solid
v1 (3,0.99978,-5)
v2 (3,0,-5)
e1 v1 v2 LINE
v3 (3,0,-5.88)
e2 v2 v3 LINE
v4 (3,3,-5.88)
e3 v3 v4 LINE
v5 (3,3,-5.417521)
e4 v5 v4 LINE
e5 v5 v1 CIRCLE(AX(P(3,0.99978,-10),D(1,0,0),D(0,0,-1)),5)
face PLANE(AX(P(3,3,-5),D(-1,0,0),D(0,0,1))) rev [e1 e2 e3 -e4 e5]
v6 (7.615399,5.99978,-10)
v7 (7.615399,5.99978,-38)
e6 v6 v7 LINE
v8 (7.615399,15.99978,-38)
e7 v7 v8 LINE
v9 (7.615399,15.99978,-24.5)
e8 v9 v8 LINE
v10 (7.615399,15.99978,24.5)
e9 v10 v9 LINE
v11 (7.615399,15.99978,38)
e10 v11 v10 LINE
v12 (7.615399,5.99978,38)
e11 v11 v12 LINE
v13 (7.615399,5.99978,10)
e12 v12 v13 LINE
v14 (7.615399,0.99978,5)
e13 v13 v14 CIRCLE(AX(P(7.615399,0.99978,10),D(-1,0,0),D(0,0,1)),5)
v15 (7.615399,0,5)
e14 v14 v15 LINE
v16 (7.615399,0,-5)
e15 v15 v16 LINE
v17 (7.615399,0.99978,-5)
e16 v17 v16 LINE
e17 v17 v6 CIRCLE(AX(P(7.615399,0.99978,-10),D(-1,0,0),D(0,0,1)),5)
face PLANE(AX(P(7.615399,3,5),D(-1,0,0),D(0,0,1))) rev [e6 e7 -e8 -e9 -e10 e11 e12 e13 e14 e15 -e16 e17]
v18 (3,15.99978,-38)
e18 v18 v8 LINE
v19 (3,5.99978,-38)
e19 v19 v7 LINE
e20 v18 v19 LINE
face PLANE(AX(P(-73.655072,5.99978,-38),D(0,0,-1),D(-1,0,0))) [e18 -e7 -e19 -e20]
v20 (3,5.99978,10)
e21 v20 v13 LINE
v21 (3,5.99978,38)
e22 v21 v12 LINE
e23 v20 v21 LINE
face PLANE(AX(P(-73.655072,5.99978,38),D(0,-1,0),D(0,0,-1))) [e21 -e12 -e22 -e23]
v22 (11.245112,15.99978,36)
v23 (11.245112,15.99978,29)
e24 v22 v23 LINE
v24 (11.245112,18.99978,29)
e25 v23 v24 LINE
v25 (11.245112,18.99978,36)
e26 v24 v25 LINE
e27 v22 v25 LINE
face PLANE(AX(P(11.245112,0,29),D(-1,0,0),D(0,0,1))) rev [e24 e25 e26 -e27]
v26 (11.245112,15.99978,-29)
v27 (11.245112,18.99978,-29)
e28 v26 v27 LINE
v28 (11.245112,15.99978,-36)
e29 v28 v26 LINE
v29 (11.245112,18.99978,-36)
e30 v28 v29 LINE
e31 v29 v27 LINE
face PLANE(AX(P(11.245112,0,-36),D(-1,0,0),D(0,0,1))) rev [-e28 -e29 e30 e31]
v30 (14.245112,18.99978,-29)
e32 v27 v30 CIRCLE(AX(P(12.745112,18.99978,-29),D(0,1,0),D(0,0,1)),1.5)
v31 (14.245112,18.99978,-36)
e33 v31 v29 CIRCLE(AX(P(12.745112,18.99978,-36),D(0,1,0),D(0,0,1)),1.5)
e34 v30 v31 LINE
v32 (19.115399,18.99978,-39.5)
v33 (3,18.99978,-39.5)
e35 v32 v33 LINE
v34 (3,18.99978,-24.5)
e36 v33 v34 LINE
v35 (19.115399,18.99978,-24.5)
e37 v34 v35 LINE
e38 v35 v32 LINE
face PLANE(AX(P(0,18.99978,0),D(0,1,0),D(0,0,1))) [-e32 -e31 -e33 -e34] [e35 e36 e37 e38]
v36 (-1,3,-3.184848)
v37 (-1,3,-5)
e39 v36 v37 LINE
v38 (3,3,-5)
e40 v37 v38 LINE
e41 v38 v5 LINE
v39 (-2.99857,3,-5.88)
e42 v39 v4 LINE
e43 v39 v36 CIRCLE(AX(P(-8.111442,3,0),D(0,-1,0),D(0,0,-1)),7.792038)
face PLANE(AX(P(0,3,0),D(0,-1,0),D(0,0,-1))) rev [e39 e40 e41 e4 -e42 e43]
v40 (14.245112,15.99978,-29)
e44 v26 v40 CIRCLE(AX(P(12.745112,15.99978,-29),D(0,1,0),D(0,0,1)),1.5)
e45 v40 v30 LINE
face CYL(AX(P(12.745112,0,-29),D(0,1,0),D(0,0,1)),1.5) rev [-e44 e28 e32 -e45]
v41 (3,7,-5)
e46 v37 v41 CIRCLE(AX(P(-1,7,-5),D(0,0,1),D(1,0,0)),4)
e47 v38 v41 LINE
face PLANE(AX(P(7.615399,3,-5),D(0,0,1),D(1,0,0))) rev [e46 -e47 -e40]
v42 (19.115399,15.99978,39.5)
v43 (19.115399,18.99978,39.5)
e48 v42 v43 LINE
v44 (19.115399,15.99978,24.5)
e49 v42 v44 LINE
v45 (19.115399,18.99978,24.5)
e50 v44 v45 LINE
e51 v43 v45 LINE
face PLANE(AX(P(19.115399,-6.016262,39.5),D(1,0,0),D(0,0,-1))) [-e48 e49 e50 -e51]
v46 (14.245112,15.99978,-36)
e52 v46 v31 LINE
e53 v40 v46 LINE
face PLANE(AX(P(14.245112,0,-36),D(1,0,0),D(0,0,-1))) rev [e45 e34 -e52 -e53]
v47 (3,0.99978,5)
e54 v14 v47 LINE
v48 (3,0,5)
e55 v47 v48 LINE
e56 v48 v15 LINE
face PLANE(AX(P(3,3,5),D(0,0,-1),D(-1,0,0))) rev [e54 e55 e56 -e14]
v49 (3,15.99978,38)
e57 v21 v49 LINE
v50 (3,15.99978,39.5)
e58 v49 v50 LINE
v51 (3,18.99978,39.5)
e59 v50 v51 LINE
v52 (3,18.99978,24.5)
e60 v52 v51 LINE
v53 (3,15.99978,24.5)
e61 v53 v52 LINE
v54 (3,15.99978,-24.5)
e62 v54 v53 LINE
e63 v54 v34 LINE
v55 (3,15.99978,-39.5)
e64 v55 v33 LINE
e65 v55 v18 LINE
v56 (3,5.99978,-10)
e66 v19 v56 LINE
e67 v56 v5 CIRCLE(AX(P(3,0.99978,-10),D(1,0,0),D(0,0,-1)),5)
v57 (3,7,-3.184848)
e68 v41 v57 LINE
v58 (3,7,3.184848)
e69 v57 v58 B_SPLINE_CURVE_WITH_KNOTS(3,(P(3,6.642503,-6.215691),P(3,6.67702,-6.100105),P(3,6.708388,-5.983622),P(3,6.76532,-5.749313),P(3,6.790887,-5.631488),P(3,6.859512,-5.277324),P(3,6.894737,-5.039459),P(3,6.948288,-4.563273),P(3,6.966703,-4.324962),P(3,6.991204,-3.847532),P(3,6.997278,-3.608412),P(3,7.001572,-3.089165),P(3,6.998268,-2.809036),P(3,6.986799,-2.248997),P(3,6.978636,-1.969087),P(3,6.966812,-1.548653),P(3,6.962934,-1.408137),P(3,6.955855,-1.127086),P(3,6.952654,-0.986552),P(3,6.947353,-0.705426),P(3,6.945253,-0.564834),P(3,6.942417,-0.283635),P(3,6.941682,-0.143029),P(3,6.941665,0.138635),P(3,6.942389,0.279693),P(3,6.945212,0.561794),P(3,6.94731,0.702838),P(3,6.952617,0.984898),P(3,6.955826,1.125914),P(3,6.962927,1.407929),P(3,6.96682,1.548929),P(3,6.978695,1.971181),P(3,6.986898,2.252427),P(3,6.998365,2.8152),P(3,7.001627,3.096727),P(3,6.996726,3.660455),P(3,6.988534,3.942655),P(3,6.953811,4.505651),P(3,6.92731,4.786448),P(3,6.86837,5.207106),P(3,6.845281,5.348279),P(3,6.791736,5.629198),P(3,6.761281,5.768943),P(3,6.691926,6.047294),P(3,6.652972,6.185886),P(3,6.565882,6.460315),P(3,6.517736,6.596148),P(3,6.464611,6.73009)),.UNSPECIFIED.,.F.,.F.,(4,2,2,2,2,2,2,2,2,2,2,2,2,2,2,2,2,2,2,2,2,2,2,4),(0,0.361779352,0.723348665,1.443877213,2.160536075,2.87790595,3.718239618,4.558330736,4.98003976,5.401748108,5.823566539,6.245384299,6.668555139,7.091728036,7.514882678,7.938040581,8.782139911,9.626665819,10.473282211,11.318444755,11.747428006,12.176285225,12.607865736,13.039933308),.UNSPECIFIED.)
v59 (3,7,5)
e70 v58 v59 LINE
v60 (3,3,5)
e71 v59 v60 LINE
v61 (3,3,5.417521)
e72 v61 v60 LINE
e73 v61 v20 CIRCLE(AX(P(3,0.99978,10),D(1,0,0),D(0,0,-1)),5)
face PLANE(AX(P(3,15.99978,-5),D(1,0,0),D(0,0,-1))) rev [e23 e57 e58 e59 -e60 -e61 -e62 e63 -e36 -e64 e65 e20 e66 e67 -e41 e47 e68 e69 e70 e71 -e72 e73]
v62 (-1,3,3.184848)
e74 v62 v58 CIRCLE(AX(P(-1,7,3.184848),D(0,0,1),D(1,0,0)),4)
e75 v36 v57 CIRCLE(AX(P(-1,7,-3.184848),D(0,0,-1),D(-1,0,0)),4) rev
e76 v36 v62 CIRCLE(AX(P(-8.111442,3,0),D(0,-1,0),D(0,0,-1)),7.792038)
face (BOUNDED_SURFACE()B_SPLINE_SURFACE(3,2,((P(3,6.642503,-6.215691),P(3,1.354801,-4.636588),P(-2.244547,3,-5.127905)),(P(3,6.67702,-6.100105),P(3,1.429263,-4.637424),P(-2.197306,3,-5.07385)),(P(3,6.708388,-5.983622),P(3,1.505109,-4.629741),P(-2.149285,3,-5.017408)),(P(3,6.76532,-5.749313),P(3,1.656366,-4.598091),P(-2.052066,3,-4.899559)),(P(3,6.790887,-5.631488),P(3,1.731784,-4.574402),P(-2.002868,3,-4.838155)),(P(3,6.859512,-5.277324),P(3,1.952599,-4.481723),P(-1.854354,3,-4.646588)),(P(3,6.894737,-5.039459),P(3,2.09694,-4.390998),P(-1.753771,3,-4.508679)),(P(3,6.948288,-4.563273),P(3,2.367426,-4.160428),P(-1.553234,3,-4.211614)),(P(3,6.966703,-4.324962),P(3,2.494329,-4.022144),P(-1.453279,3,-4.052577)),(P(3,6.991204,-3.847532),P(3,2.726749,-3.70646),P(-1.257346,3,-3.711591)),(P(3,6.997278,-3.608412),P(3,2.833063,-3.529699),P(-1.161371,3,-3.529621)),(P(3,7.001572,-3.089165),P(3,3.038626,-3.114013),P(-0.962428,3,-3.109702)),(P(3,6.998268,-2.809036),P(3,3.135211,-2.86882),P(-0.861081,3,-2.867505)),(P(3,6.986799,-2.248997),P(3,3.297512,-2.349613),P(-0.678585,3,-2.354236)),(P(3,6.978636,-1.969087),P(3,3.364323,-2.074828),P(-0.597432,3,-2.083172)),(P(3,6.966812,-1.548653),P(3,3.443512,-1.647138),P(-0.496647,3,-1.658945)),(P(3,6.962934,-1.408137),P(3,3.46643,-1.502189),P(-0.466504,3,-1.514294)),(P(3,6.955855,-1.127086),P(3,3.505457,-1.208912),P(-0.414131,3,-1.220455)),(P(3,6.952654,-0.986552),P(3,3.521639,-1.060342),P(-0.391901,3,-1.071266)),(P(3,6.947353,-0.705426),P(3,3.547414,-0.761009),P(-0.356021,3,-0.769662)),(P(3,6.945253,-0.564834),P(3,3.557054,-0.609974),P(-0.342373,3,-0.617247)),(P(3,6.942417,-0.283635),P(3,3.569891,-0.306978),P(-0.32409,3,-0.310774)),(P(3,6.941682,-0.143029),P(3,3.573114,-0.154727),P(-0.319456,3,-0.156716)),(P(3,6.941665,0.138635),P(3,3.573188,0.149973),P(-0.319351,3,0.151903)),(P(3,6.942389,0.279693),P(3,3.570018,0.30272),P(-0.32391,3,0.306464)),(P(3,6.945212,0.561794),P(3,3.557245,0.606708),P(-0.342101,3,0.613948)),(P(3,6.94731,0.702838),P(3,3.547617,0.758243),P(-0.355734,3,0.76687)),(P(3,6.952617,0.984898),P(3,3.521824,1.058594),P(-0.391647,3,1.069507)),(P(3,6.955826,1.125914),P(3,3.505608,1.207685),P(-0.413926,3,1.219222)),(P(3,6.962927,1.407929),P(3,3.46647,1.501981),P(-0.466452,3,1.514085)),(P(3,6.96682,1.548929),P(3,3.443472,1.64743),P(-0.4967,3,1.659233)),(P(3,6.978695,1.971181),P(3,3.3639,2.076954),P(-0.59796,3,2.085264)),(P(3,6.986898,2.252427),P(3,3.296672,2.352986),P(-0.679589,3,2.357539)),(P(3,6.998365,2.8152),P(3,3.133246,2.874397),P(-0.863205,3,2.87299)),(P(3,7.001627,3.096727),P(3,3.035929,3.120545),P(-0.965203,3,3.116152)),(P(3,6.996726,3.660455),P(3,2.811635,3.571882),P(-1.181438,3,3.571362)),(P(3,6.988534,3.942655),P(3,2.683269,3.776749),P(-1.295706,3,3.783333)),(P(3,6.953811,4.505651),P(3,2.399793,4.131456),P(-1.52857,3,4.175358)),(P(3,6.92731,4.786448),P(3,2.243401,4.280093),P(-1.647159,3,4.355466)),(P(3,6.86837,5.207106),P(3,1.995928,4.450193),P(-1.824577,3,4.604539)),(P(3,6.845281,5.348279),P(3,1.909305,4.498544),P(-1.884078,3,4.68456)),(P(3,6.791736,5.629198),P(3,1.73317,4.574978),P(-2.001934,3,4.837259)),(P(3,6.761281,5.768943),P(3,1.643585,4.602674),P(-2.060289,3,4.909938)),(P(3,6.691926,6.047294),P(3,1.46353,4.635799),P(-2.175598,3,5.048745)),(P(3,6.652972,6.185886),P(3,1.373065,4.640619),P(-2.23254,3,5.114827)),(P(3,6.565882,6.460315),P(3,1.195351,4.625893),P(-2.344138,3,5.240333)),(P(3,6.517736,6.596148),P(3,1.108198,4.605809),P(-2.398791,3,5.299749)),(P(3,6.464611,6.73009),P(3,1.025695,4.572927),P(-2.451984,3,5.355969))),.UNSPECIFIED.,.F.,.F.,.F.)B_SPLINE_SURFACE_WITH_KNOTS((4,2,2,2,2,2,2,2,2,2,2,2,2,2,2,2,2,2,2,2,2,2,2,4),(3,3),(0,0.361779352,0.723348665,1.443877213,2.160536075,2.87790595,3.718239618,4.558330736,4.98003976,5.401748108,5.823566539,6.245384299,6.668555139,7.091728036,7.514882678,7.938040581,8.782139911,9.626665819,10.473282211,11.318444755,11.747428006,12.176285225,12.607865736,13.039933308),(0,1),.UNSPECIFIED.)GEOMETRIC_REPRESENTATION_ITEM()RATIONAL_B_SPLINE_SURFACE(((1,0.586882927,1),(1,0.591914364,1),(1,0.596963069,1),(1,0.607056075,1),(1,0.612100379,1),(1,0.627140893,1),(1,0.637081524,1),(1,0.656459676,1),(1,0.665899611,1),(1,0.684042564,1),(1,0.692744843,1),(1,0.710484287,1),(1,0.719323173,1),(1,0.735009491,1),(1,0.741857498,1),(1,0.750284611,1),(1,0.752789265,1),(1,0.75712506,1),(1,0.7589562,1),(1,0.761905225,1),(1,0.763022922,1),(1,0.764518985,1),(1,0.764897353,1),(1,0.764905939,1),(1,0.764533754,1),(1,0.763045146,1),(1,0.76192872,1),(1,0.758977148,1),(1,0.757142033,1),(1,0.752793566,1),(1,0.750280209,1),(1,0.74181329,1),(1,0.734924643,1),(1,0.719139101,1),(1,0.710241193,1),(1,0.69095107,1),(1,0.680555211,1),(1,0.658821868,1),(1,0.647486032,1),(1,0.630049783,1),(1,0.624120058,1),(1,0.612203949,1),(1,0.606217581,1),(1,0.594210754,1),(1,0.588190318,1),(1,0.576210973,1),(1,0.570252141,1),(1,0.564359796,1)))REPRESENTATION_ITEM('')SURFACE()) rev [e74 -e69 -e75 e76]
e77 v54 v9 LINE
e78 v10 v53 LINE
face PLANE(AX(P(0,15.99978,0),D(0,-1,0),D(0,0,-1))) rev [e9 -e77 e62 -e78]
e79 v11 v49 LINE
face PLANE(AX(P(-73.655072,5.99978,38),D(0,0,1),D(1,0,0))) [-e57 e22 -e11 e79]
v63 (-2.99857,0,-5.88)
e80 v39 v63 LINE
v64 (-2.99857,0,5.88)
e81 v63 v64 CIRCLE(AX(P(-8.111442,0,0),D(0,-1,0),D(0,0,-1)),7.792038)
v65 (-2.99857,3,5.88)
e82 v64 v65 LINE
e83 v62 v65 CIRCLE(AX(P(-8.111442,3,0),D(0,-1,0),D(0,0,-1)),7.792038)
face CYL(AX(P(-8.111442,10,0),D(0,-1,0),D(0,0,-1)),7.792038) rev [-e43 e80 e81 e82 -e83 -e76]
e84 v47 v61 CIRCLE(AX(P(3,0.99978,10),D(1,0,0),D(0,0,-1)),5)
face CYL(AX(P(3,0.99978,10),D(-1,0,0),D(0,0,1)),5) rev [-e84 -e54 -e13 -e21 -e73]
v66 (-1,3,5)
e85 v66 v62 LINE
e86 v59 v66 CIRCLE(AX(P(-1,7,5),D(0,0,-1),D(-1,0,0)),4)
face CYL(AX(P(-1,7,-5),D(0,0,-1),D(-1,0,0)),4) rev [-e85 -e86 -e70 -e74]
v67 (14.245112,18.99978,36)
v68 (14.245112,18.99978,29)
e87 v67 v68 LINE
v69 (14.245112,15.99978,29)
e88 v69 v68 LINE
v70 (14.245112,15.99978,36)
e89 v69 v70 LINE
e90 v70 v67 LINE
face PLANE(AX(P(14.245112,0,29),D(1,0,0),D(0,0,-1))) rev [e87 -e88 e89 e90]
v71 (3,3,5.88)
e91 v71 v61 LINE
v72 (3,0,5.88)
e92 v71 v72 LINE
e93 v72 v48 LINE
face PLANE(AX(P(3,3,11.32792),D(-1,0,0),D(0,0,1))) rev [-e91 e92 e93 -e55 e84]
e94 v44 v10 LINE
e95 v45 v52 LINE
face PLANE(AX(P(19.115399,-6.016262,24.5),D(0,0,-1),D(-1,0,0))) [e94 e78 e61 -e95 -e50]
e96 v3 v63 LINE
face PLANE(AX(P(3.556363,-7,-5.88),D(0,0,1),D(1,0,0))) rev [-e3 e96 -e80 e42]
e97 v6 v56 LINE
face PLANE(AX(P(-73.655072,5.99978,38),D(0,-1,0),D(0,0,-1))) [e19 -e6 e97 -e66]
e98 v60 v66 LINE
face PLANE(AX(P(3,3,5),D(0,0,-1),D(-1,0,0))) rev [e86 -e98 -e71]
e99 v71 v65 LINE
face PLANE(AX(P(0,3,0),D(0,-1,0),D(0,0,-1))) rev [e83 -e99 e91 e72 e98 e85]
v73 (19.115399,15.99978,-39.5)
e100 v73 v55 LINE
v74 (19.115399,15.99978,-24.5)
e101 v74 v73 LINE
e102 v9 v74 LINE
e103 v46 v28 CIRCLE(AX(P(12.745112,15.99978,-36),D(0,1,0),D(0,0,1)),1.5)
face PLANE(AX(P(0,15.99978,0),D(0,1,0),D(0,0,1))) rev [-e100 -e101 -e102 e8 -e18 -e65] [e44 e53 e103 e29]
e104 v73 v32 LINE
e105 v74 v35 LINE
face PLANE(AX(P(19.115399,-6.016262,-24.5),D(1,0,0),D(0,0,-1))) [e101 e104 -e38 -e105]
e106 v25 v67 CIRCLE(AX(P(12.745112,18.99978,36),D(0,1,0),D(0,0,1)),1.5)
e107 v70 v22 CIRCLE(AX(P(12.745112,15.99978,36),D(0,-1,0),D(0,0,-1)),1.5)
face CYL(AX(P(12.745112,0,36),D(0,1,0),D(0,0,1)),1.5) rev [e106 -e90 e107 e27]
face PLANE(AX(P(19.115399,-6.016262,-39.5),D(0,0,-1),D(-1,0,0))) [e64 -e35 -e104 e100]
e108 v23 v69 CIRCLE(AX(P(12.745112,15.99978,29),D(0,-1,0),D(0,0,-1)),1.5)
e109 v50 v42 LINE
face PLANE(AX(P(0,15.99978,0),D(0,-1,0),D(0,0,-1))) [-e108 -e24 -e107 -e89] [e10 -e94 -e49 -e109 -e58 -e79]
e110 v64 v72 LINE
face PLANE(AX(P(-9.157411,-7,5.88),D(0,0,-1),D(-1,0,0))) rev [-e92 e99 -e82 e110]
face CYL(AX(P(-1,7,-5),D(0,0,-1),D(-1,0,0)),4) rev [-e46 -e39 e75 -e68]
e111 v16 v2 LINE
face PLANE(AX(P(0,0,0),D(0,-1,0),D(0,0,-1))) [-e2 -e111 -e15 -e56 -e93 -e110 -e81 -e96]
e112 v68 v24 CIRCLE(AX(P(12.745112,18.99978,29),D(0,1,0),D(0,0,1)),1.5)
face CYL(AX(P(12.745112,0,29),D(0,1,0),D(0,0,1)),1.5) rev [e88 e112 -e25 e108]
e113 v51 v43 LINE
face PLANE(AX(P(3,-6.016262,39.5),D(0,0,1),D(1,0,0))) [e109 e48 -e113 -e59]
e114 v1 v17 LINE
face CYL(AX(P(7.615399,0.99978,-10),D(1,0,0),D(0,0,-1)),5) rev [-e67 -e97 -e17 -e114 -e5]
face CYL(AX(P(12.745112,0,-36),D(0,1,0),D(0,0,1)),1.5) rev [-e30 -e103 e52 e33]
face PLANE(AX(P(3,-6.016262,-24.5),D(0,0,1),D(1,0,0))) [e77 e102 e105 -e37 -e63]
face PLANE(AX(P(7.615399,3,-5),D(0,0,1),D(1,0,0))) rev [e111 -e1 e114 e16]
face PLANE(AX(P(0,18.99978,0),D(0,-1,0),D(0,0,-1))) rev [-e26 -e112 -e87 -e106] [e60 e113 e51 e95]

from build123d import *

# Parameters (mm, degrees)
SKETCH1_R           = 1.5
BOSS_EXTRUDE1_DEPTH = 3
SKETCH3_W           = 4.615398666
SKETCH3_H           = 10
BOSS_EXTRUDE2_DEPTH = 12.9997796
FILLET7_R           = 1
CUT_EXTRUDE4_DEPTH  = 10
FILLET8_R           = 4
SKETCH8_W           = 76
SKETCH8_H           = 10
BOSS_EXTRUDE3_DEPTH = 4.615398666
SKETCH9_W           = 14.615398666
SKETCH9_H           = 12
SKETCH9_R           = 1.5
BOSS_EXTRUDE4_DEPTH = 3
FILLET9_R           = 5
FILLET10_R          = 5
SKETCH10_W          = 9.773230982
SKETCH10_H          = 9.985016007
SKETCH10_W_2        = 12.713773796
SKETCH10_H_2        = 7.76031956
CUT_EXTRUDE6_DEPTH  = 10
CUT_EXTRUDE7_DEPTH  = 46.992324429
BOSS_EXTRUDE5_DEPTH = 3


with BuildPart() as part:
    # Sketch1 → Boss-Extrude1 (new body)
    with BuildSketch(Plane(origin=(0, 0, 0), x_dir=(1, 0, 0), z_dir=(0, 1, 0))):
        Polygon((-3, -11.32792047), (3, -11.32792047), (3, -5), (7.615398666, -5), (7.615398666, 5), (3, 5), (3, 11.32792047), (-3, 11.32792047), align=None)
        with Locations(Location((0, 8.5, 0), (0, 0, 270))):
            Circle(SKETCH1_R, mode=Mode.SUBTRACT)
        with Locations(Location((0, -8.5, 0), (0, 0, 270))):
            Circle(SKETCH1_R, mode=Mode.SUBTRACT)
    extrude(amount=BOSS_EXTRUDE1_DEPTH)

    # Sketch3 → Boss-Extrude2 (add)
    with BuildSketch(Plane(origin=(0, 3, 0), x_dir=(1, 0, 0), z_dir=(0, 1, 0))):
        with Locations((5.307699333, 0)):
            Rectangle(SKETCH3_W, SKETCH3_H)
    extrude(amount=BOSS_EXTRUDE2_DEPTH)

    # Fillet7
    fillet7_edges = [part.edges().sort_by_distance(p)[0] for p in [
        (3, 1.5, 11.32792047),
        (3, 1.5, -11.32792047),
    ]]
    fillet(fillet7_edges, radius=FILLET7_R)

    # Sketch7 → Cut-Extrude4 (cut)
    with BuildSketch(Plane.XZ):
        with BuildLine():
            Line((-3.65526474, -6.392053518), (-3.78188192, 6.478485425))
            ThreePointArc((-3.78188192, 6.478485425), (-0.319780446, 0.076652438), (-3.65526474, -6.392053518))
        make_face()
    extrude(amount=-CUT_EXTRUDE4_DEPTH, mode=Mode.SUBTRACT)

    # Fillet8
    fillet8_edges = [part.edges().sort_by_distance(p)[0] for p in [
        (3, 3, 0),
    ]]
    fillet(fillet8_edges, radius=FILLET8_R)

    # Sketch8 → Boss-Extrude3 (add)
    with BuildSketch(Plane(origin=(7.615398666, 0, 0), x_dir=(0, 0, -1), z_dir=(1, 0, 0))):
        with Locations((0, 10.9997796)):
            Rectangle(SKETCH8_W, SKETCH8_H)
    extrude(amount=-BOSS_EXTRUDE3_DEPTH)

    # Sketch9 → Boss-Extrude4 (add)
    # profile 1 of 2: a face of its own
    with BuildSketch(Plane(origin=(0, 15.9997796, 0), x_dir=(1, 0, 0), z_dir=(0, 1, 0))):
        with Locations((10.307699333, 32)):
            Rectangle(SKETCH9_W, SKETCH9_H)
        with Locations(Location((12.745112207, 32.5, 0), (0, 0, 270))):
            Circle(SKETCH9_R, mode=Mode.SUBTRACT)
    # profile 2 of 2: a face of its own
    with BuildSketch(Plane(origin=(0, 15.9997796, 0), x_dir=(1, 0, 0), z_dir=(0, 1, 0))):
        with Locations((10.307699333, -32)):
            Rectangle(SKETCH9_W, SKETCH9_H)
        with Locations(Location((12.745112207, -32.5, 0), (0, 0, 270))):
            Circle(SKETCH9_R, mode=Mode.SUBTRACT)
    extrude(amount=BOSS_EXTRUDE4_DEPTH)

    # Fillet9
    # the kernel refuses this fillet: 5 mm, written as the material it adds along each edge
    with BuildSketch(Plane(origin=(7.615398666, 5.9997796, 5), x_dir=(0, -1, 0), z_dir=(-1, 0, 0))) as fillet9_piece_1:
        with BuildLine():
            CenterArc((FILLET9_R, FILLET9_R), FILLET9_R, 180, 90)
            Line((0, FILLET9_R), (0, 0))
            Line((0, 0), (FILLET9_R, 0))
        make_face()
    extrude(amount=4.615398666)

    # Fillet10
    # the kernel refuses this fillet: 5 mm, written as the material it adds along each edge
    with BuildSketch(Plane(origin=(3, 5.9997796, -5), x_dir=(0, -1, 0), z_dir=(1, 0, 0))) as fillet10_piece_1:
        with BuildLine():
            CenterArc((FILLET10_R, FILLET10_R), FILLET10_R, 180, 90)
            Line((0, FILLET10_R), (0, 0))
            Line((0, 0), (FILLET10_R, 0))
        make_face()
    extrude(amount=4.615398666)

    # Sketch10 → Cut-Extrude6 (cut)
    with BuildSketch(Plane(origin=(0, 3, 0), x_dir=(1, 0, 0), z_dir=(0, 1, 0))):
        with Locations((-1.330252474, 10.872508004)):
            Rectangle(SKETCH10_W, SKETCH10_H)
        with Locations((-2.800523881, -9.76015978)):
            Rectangle(SKETCH10_W_2, SKETCH10_H_2)
    extrude(amount=-CUT_EXTRUDE6_DEPTH, mode=Mode.SUBTRACT)

    # Sketch11 → Cut-Extrude7 (cut, through all)
    with BuildSketch(Plane(origin=(0, 18.9997796, 0), x_dir=(1, 0, 0), z_dir=(0, 1, 0))):
        with BuildLine():
            Line((14.245112207, 36), (14.245112207, 29))
            ThreePointArc((14.245112207, 29), (12.745112207, 27.5), (11.245112207, 29))
            Line((11.245112207, 29), (11.245112207, 36))
            ThreePointArc((11.245112207, 36), (12.745112207, 37.5), (14.245112207, 36))
        make_face()
        with BuildLine():
            Line((14.245112207, -29), (14.245112207, -36))
            ThreePointArc((14.245112207, -36), (12.745112207, -37.5), (11.245112207, -36))
            Line((11.245112207, -36), (11.245112207, -29))
            ThreePointArc((11.245112207, -29), (12.745112207, -27.5), (14.245112207, -29))
        make_face()
    extrude(amount=-CUT_EXTRUDE7_DEPTH, mode=Mode.SUBTRACT)

    # Sketch13 → Boss-Extrude5 (add)
    with BuildSketch(Plane(origin=(0, 18.9997796, 0), x_dir=(1, 0, 0), z_dir=(0, 1, 0))):
        Polygon((3, -38), (3, -39.5), (19.115398666, -39.5), (19.115398666, -24.5), (3, -24.5), (3, -26), (17.615398666, -26), (17.615398666, -38), align=None)
        Polygon((3, 26), (3, 24.5), (19.115398666, 24.5), (19.115398666, 39.5), (3, 39.5), (3, 38), (17.615398666, 38), (17.615398666, 26), align=None)
    extrude(amount=-BOSS_EXTRUDE5_DEPTH)


solid = part.part
